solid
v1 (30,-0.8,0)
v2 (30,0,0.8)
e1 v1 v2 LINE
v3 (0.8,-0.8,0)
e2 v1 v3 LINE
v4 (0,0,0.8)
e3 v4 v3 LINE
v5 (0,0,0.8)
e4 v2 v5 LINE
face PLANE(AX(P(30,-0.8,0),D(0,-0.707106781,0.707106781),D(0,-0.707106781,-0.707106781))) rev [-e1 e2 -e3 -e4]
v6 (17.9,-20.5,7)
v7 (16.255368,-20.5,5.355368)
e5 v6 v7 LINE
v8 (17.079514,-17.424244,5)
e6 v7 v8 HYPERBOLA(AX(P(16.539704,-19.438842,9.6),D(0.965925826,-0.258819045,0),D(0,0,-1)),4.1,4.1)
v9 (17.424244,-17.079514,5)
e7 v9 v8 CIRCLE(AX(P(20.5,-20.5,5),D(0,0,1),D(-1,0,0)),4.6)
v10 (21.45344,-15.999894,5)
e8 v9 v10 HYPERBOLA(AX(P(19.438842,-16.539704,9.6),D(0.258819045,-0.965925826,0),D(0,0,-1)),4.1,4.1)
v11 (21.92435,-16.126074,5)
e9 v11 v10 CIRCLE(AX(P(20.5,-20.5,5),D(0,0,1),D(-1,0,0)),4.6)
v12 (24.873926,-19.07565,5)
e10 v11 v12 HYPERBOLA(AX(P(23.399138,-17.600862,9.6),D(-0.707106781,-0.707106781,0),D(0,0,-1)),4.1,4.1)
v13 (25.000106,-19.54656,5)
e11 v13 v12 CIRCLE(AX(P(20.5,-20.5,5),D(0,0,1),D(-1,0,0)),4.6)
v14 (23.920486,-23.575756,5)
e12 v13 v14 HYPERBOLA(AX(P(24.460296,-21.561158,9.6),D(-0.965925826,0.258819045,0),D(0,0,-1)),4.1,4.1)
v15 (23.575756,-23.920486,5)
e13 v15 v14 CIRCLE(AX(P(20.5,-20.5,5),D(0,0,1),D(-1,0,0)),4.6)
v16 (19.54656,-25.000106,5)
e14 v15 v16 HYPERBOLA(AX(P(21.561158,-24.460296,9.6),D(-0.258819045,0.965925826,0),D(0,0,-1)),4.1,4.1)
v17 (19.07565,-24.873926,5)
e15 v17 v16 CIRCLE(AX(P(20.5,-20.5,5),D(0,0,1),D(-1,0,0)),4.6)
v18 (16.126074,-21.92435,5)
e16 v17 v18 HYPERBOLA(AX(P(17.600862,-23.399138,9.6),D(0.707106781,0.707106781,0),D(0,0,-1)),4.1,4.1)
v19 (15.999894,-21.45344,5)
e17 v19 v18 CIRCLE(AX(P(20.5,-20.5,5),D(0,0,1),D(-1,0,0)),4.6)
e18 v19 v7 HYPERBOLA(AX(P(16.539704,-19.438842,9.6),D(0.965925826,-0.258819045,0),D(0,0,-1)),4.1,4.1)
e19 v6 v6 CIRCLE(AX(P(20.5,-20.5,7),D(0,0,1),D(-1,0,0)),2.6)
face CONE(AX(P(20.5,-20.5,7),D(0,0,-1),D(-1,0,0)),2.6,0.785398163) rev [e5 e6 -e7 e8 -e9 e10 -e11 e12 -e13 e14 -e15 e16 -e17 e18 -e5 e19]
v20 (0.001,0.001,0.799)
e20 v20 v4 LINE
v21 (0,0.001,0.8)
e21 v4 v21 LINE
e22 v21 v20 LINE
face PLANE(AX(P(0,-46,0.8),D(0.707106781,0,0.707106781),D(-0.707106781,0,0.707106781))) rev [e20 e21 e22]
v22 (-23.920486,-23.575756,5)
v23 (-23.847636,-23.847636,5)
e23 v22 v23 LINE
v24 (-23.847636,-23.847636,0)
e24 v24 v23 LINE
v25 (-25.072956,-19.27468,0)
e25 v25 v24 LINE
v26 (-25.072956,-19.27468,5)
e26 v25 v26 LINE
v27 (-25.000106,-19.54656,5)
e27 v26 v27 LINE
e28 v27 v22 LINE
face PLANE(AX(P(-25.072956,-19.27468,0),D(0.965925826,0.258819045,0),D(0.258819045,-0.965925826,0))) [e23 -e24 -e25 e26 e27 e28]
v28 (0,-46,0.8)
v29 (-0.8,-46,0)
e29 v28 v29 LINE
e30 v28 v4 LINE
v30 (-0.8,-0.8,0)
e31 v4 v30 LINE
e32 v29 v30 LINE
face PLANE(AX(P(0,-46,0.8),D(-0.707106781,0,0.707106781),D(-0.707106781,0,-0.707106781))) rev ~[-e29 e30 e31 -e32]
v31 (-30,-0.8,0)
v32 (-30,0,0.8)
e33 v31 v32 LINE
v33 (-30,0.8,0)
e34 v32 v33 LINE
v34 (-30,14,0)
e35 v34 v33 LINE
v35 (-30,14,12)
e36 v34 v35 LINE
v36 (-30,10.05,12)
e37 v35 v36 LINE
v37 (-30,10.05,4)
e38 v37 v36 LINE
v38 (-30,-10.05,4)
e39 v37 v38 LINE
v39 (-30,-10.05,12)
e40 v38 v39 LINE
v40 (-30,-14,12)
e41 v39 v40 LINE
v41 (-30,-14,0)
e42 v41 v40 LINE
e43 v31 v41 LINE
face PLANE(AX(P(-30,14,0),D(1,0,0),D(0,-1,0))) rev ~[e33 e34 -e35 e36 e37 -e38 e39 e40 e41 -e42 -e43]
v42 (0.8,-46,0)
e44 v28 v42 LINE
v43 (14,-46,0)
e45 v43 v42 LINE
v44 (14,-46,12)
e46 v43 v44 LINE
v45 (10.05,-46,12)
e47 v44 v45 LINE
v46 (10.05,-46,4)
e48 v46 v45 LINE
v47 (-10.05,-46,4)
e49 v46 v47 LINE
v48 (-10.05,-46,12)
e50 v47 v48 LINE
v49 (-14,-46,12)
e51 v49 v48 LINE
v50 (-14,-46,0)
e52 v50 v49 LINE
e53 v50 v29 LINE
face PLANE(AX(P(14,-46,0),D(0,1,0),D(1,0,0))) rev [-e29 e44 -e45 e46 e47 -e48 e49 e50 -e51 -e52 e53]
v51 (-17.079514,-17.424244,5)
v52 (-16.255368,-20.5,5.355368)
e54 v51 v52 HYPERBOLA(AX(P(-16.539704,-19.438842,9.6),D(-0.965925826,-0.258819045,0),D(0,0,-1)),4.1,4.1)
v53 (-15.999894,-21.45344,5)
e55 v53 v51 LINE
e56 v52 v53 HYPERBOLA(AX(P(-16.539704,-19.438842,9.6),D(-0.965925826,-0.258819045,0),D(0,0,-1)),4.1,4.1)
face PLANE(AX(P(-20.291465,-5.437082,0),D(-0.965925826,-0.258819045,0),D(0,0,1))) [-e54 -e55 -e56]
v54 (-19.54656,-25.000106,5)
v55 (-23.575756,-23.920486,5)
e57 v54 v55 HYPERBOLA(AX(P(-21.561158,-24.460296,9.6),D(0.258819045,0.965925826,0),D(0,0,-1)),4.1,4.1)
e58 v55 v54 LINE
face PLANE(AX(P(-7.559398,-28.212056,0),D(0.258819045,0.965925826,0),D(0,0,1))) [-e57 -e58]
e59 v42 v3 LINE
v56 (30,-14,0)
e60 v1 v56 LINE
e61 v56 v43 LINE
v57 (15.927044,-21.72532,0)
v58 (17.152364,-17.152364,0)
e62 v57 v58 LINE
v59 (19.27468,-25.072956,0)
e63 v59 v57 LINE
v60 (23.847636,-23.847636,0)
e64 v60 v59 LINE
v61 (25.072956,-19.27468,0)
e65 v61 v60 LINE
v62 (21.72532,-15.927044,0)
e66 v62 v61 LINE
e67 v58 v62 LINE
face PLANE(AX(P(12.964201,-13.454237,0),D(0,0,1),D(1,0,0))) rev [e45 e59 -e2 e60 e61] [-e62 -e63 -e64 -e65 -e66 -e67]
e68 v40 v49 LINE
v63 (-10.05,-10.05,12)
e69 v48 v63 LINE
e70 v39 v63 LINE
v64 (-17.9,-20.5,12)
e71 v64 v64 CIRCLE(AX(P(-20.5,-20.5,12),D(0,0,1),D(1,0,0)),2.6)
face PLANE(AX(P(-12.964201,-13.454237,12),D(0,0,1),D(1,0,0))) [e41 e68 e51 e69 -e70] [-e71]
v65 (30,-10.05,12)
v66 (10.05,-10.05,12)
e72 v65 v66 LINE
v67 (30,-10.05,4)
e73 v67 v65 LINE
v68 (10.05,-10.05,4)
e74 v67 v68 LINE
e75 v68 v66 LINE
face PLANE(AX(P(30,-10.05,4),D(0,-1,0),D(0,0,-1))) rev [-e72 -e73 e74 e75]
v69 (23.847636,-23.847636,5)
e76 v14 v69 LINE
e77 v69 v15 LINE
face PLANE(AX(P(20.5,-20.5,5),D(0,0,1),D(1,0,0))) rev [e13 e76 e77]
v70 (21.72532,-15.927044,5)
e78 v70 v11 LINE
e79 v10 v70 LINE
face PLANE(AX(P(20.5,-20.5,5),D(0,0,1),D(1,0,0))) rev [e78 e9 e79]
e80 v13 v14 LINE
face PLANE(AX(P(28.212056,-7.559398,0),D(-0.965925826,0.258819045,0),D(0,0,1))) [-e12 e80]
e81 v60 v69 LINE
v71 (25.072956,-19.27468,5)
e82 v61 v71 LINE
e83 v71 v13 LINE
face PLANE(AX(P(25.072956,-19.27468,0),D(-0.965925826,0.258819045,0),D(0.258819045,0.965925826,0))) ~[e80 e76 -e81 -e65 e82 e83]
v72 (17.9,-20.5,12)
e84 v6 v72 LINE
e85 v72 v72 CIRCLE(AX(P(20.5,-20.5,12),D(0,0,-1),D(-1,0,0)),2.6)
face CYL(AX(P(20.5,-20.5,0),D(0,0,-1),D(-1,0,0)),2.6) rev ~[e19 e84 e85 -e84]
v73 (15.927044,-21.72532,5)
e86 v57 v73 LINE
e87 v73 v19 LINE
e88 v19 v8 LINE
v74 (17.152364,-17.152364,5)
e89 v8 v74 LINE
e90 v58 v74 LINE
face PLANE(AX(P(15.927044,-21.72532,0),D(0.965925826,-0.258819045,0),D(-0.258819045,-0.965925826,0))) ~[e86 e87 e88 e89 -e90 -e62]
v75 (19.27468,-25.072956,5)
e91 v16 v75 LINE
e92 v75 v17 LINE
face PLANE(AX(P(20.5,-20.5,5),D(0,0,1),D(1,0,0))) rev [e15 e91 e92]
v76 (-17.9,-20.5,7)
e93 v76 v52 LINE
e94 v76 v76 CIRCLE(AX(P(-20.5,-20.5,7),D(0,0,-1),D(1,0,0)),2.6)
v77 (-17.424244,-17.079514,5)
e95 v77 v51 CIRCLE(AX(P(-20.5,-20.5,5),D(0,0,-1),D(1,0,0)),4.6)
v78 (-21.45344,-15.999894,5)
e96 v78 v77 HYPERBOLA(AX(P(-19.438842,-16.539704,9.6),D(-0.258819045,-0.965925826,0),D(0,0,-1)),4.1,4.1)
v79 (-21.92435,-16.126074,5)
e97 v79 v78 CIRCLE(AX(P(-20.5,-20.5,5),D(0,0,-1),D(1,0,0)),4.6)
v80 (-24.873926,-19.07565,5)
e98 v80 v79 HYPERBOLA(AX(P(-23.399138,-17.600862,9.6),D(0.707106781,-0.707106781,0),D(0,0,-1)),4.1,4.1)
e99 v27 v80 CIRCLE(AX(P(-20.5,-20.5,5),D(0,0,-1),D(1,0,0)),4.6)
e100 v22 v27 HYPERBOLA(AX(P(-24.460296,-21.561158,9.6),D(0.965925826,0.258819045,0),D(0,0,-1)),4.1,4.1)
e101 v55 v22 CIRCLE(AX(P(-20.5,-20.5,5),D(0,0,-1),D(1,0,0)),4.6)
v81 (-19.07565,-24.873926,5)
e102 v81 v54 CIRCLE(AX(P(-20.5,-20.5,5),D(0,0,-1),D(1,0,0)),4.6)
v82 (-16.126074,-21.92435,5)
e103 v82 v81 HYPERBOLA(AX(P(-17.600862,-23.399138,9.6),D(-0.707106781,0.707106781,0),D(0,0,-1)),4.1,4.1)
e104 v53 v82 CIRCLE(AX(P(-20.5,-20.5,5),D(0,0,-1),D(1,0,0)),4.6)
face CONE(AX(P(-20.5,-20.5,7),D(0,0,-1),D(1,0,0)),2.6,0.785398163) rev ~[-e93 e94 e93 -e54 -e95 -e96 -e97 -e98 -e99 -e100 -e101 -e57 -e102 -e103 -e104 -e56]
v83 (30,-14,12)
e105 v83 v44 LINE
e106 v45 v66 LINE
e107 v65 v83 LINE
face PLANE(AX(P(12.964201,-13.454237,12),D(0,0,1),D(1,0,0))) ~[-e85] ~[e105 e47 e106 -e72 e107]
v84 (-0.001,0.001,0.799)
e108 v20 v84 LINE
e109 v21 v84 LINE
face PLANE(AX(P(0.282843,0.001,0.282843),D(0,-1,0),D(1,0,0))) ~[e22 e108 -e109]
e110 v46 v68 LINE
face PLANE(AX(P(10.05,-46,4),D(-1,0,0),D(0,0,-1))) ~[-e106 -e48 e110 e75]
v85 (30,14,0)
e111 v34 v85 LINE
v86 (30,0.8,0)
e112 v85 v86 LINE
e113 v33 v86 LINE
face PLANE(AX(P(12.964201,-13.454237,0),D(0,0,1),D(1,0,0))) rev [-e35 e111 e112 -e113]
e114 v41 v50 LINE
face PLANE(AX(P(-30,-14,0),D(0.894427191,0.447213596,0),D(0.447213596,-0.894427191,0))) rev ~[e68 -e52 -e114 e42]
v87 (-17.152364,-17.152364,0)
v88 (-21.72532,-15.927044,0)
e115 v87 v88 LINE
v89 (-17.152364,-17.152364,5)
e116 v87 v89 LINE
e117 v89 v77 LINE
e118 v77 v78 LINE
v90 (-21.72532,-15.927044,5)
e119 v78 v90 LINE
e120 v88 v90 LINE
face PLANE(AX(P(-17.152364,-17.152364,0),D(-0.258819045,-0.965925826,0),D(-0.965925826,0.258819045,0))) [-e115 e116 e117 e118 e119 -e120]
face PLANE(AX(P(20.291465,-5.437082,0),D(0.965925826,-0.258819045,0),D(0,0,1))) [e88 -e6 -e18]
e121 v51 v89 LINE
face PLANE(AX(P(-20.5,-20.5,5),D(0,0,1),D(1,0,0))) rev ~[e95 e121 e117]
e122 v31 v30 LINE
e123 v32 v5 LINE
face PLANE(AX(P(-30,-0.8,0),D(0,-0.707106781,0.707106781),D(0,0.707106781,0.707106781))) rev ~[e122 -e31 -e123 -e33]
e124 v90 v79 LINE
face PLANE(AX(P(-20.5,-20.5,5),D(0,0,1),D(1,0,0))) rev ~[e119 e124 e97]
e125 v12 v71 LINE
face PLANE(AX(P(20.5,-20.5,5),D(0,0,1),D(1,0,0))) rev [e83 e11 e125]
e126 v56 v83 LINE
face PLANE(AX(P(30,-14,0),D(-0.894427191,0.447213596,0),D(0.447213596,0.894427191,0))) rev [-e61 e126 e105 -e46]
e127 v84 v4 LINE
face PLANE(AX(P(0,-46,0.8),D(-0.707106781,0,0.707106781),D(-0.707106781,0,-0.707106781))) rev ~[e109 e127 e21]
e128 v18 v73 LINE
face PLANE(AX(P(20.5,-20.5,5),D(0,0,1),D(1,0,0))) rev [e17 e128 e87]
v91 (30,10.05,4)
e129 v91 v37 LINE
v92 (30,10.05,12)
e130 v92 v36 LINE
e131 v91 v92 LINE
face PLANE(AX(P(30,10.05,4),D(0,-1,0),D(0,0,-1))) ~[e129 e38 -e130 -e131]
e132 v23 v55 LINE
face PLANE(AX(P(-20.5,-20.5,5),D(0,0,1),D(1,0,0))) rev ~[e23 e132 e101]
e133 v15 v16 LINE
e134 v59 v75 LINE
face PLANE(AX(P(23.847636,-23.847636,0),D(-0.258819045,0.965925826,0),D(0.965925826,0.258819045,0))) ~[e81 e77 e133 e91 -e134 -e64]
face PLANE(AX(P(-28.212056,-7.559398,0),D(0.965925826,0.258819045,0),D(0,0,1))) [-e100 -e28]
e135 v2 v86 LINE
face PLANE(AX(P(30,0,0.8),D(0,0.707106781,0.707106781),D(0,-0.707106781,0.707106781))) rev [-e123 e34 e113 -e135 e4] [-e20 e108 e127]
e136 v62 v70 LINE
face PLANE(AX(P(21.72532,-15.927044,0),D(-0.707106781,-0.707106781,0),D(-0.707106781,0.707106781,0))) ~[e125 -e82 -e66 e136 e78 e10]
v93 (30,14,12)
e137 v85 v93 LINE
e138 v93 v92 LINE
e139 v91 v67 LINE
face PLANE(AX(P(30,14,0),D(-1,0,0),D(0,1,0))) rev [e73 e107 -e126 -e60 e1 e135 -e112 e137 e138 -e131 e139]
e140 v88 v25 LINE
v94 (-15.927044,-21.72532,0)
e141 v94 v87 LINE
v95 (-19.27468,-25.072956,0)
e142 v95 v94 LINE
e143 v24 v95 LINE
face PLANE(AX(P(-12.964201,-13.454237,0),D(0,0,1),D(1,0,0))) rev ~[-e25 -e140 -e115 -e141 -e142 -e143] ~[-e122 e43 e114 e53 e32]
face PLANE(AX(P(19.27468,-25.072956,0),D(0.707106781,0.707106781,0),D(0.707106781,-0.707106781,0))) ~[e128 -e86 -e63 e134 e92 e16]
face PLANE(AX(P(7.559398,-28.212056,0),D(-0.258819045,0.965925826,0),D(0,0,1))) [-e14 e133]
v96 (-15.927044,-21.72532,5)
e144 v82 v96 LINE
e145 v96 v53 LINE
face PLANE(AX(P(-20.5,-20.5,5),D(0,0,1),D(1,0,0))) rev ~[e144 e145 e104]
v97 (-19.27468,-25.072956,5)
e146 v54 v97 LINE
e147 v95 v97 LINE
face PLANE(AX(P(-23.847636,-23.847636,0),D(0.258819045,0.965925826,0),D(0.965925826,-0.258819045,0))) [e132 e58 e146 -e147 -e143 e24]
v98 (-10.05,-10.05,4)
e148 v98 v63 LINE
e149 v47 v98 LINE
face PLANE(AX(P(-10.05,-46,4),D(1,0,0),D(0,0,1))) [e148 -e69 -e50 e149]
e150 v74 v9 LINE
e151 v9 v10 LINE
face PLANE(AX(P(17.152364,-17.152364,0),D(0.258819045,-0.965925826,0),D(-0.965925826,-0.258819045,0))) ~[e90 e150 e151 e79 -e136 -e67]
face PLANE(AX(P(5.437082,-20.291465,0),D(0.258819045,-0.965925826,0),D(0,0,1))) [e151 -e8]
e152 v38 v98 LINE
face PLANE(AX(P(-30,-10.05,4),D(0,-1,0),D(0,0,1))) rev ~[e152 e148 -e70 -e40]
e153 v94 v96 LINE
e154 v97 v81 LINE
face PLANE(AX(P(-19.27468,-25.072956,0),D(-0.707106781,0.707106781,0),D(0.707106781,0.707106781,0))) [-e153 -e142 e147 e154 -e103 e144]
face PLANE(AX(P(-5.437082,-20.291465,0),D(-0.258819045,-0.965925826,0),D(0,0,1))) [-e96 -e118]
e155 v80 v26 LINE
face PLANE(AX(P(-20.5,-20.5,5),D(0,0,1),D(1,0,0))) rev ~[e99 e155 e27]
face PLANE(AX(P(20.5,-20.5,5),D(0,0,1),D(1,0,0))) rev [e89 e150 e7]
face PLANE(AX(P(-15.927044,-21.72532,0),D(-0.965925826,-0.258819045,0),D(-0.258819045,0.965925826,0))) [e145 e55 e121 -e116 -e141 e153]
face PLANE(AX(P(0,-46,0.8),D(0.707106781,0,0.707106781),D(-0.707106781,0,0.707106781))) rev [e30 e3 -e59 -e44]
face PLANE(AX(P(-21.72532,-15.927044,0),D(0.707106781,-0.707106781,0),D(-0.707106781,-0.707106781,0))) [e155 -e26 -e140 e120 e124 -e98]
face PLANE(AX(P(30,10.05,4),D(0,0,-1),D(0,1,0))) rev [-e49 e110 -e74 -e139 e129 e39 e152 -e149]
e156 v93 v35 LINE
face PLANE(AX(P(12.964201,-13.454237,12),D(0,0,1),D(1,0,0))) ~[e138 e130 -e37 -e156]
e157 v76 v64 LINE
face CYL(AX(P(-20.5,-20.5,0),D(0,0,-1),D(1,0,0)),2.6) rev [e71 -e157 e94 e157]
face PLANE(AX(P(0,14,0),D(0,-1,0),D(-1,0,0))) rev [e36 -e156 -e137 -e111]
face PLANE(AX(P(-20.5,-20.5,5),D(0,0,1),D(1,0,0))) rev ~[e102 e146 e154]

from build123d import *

# Parameters (mm, degrees)
F0_R     = 2.6
F1_DEPTH = 12
F3_W     = 20.1
F3_H     = 8
F4_DEPTH = 30.001
F2_W     = 10.05
F2_H     = 8
F5_DEPTH = 46.001
F7_DEPTH = 5


# Not quite as in the source:
# - a fillet or chamfer that OpenCascade refuses, or shapes differently, is made with other operations: its cross-section is extruded or revolved along the edge and cut away or added


with BuildPart() as f1:
    # F0 (on Top) → F1 (new body)
    with BuildSketch(Plane.XY):
        Polygon((0, -46), (0, 14), (-30, 14), (-30, -14), (-14, -46), align=None)
        with Locations((-20.5, -20.5)):
            Circle(F0_R, mode=Mode.SUBTRACT)
    extrude(amount=F1_DEPTH)

    # F3 (on face) → F4 (cut, through all)
    with BuildSketch(Plane(origin=(-30, 0, 0), x_dir=(0, -1, 0), z_dir=(-1, 0, 0))):
        with Locations((0, 8)):
            Rectangle(F3_W, F3_H)
        Polygon((0, 0.8), (-0.8, 0), (0.8, 0), align=None)
    extrude(amount=-F4_DEPTH, mode=Mode.SUBTRACT)

    # F2 (on face) → F5 (cut, through all)
    with BuildSketch(Plane.XZ.offset(46)):
        with Locations((-5.025, 8)):
            Rectangle(F2_W, F2_H)
        Polygon((-0.8, 0), (0, 0), (0, 0.8), align=None)
    extrude(amount=-F5_DEPTH, mode=Mode.SUBTRACT)

    # F6 (on face) → F7 (cut)
    with BuildSketch(Plane.XY):
        Polygon((-15.9270442062, -21.725319812), (-17.1523640182, -17.1523640182), (-21.725319812, -15.9270442062), (-25.0729557938, -19.274680188), (-23.8476359818, -23.8476359818), (-19.274680188, -25.0729557938), align=None)
    extrude(amount=F7_DEPTH, mode=Mode.SUBTRACT)

    # F8: F1 across plane


with BuildPart() as f1_1:
    add(f1.part)
    add(f1.part.mirror(Plane.YZ))

    # F9: chamfer of 2 on 2 edges, made by hand


with BuildPart() as f9_tool2:
    # F9_s3 → F9_t4 (revolve)
    with BuildSketch(Plane.XZ.offset(20.5)):
        Polygon((17.9, 7), (15.9, 5), (17.9, 5), align=None)
    revolve(axis=Axis((20.5, -20.5, 5), (0, 0, 1)))

    split(bisect_by=Plane(origin=(20.291464501, -5.4370815263, 0), x_dir=(0, 0, 1), z_dir=(0.9659258263, -0.2588190451, 0)), keep=Keep.TOP)

    split(bisect_by=Plane(origin=(-2.8991378029, -2.8991378029, 0), x_dir=(0, 0, 1), z_dir=(0.7071067812, 0.7071067812, 0)), keep=Keep.TOP)

    split(bisect_by=Plane(origin=(5.4370815263, -20.291464501, 0), x_dir=(0, 0, 1), z_dir=(0.2588190451, -0.9659258263, 0)), keep=Keep.TOP)

    split(bisect_by=Plane(origin=(7.5593976961, -28.2120562766, 0), x_dir=(0, 0, 1), z_dir=(-0.2588190451, 0.9659258263, 0)), keep=Keep.TOP)

    split(bisect_by=Plane(origin=(2.8991378029, 2.8991378029, 0), x_dir=(0, 0, 1), z_dir=(-0.7071067812, -0.7071067812, 0)), keep=Keep.TOP)

    split(bisect_by=Plane(origin=(28.2120562766, -7.5593976961, 0), x_dir=(0, 0, 1), z_dir=(-0.9659258263, 0.2588190451, 0)), keep=Keep.TOP)


with BuildPart() as f1_2:
    add(f1_1.part)

    # F9_t1: cut F9_tool2
    add(f9_tool2.part, mode=Mode.SUBTRACT)


with BuildPart() as f9_tool12:
    # F9_s13 → F9_t14 (revolve)
    with BuildSketch(Plane.XZ.offset(20.5)):
        Polygon((-17.9, 7), (-15.9, 5), (-17.9, 5), align=None)
    revolve(axis=Axis((-20.5, -20.5, 5), (0, 0, -1)))

    split(bisect_by=Plane(origin=(-20.291464501, -5.4370815263, 0), x_dir=(0, 0, 1), z_dir=(-0.9659258263, -0.2588190451, 0)), keep=Keep.TOP)

    split(bisect_by=Plane(origin=(2.8991378029, -2.8991378029, 0), x_dir=(0, 0, 1), z_dir=(-0.7071067812, 0.7071067812, 0)), keep=Keep.TOP)

    split(bisect_by=Plane(origin=(-5.4370815263, -20.291464501, 0), x_dir=(0, 0, 1), z_dir=(-0.2588190451, -0.9659258263, 0)), keep=Keep.TOP)

    split(bisect_by=Plane(origin=(-7.5593976961, -28.2120562766, 0), x_dir=(0, 0, 1), z_dir=(0.2588190451, 0.9659258263, 0)), keep=Keep.TOP)

    split(bisect_by=Plane(origin=(-2.8991378029, 2.8991378029, 0), x_dir=(0, 0, 1), z_dir=(0.7071067812, -0.7071067812, 0)), keep=Keep.TOP)

    split(bisect_by=Plane(origin=(-28.2120562766, -7.5593976961, 0), x_dir=(0, 0, 1), z_dir=(0.9659258263, 0.2588190451, 0)), keep=Keep.TOP)


with BuildPart() as f1_3:
    add(f1_2.part)

    # F9_t11: cut F9_tool12
    add(f9_tool12.part, mode=Mode.SUBTRACT)


solid = f1_3.part
